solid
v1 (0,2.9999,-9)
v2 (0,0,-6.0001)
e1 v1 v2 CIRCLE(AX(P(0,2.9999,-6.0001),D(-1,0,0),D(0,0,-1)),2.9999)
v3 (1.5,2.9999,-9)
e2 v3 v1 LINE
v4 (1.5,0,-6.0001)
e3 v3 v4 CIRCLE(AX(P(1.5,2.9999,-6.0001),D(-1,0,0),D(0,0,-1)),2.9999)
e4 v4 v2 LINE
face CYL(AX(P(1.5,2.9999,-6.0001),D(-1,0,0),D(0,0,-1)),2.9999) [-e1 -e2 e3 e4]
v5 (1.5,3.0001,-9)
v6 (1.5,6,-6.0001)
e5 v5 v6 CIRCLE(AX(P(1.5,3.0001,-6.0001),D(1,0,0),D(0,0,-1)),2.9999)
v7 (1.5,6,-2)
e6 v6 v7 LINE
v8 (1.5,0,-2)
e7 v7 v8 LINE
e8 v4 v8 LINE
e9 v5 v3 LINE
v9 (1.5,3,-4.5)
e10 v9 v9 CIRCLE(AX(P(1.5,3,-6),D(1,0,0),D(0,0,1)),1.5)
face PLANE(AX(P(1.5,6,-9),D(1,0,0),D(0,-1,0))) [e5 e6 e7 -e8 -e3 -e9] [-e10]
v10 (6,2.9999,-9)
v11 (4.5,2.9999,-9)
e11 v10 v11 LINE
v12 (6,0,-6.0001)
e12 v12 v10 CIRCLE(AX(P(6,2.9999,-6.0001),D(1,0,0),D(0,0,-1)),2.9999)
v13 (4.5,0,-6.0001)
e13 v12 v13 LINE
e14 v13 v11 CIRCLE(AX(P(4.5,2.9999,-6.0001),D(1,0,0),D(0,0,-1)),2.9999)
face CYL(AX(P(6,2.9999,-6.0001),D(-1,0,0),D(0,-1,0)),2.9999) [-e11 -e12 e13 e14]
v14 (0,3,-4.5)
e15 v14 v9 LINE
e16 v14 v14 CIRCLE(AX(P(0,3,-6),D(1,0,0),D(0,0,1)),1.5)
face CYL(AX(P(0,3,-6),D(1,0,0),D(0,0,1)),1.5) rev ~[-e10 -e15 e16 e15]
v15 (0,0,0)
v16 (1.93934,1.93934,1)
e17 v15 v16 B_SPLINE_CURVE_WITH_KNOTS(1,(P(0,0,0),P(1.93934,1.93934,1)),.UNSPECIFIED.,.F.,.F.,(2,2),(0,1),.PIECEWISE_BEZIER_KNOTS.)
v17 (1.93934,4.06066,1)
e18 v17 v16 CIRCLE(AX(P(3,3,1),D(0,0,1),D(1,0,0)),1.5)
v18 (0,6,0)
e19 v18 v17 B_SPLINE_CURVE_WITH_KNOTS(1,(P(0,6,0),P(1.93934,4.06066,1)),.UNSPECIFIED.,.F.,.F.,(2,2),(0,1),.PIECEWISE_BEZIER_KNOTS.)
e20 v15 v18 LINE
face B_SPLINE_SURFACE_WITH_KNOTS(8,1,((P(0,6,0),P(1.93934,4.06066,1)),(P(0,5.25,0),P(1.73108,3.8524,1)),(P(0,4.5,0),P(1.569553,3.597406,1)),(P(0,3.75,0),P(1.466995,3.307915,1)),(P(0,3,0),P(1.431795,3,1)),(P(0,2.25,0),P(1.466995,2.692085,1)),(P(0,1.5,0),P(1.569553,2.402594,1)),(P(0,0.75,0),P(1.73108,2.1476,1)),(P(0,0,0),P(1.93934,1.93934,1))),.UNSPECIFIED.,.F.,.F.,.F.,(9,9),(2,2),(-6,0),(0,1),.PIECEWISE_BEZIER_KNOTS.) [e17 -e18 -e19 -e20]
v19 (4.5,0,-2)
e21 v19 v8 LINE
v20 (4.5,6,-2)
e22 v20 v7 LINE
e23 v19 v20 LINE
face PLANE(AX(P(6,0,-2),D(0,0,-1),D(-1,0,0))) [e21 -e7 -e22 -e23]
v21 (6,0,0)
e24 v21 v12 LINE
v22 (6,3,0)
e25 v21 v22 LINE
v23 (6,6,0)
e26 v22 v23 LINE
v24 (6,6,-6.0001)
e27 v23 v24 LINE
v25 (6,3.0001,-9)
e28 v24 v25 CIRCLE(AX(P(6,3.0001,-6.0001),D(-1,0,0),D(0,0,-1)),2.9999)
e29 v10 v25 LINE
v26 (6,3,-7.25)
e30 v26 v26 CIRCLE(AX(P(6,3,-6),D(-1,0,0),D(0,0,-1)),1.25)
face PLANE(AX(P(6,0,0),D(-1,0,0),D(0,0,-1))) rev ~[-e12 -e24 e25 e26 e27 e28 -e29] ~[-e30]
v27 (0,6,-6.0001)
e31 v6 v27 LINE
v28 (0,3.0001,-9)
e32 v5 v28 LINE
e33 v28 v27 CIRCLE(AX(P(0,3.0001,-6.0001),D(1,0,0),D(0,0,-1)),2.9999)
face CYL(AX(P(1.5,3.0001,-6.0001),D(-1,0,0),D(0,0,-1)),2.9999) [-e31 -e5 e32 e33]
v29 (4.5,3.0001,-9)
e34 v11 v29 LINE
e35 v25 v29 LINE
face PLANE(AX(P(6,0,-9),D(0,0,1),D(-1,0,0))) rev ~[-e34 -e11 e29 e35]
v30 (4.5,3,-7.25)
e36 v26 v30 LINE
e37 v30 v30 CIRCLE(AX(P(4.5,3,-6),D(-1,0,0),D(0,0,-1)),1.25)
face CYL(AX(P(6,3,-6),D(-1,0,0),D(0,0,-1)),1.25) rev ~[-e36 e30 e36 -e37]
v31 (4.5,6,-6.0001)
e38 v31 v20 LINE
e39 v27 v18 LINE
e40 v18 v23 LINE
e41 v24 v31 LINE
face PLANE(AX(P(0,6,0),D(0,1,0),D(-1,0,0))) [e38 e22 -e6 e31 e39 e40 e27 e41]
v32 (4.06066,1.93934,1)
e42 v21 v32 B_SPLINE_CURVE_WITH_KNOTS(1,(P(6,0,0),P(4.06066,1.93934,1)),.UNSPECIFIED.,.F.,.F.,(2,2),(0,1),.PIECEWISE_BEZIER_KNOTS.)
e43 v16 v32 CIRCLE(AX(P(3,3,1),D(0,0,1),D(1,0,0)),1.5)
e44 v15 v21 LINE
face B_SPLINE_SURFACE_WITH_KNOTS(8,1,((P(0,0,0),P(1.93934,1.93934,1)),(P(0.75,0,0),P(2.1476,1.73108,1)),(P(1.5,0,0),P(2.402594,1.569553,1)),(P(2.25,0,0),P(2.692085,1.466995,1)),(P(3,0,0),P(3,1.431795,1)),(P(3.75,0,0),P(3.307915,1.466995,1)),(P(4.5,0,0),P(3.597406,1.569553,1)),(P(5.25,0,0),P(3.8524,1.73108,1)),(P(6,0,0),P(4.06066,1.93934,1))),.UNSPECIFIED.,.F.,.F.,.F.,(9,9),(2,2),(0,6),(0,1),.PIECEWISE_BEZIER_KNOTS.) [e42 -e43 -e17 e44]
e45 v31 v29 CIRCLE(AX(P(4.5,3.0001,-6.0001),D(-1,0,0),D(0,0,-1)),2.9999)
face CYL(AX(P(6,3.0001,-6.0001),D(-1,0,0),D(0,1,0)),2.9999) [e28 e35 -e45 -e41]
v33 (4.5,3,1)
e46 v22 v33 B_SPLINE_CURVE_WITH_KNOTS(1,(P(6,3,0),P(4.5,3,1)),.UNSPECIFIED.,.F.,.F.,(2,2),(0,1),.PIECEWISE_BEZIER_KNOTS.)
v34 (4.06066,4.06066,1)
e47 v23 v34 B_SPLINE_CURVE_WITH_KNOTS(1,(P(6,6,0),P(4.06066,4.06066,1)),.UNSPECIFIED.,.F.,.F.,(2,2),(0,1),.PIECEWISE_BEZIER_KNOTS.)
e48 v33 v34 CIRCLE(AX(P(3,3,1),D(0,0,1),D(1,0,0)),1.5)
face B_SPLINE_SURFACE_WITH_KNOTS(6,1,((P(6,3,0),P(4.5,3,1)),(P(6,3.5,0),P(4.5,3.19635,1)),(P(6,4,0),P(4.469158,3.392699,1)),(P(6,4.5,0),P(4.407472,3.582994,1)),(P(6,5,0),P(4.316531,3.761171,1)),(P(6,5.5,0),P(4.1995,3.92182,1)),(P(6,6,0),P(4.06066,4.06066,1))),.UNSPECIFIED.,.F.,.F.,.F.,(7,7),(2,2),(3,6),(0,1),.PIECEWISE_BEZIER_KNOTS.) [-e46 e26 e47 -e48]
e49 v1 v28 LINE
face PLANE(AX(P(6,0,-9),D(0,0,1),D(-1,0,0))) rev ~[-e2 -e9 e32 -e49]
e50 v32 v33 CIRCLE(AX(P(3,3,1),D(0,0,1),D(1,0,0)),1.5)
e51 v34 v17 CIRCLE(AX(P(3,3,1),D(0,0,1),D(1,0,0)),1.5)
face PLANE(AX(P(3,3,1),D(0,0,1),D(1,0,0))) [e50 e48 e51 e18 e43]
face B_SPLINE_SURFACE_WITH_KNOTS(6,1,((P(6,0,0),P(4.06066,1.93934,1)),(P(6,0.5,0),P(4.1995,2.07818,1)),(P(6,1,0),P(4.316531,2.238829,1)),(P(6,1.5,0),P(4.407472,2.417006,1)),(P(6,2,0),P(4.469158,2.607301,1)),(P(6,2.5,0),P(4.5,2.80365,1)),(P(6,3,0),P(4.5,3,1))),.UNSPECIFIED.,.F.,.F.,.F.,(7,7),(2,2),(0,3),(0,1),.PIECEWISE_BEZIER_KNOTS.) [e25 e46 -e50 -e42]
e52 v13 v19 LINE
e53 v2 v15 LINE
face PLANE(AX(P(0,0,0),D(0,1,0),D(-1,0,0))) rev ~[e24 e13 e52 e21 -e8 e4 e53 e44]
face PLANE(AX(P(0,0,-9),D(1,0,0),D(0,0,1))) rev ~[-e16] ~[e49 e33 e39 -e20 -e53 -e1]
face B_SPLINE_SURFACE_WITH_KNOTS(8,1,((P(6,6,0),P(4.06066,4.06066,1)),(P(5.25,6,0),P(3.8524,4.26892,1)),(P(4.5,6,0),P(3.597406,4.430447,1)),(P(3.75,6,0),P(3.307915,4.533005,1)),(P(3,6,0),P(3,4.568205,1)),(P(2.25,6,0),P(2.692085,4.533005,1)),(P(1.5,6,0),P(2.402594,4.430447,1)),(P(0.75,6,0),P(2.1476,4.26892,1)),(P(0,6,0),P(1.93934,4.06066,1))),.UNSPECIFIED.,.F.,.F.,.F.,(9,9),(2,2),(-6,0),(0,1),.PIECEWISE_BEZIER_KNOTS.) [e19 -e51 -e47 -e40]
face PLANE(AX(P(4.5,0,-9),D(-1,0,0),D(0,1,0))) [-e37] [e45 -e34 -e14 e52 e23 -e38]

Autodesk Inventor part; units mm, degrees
ref_plane "YZ Plane" through (0, 0, 0) normal (1, 0, 0) x (0, 1, 0)
ref_plane "XZ Plane" through (0, 0, 0) normal (0, 1, 0) x (-1, 0, 0)
sketch "Sketch1" plane through (0, 0, 0) normal (0, 1, 0) x (-1, 0, 0)
  line L0 (0, 0) -> (-6, 0)
  line L1 (-6, 0) -> (-6, -9)
  line L2 (-6, -9) -> (0, -9)
  line L3 (0, -9) -> (0, 0)
  dimension "d0" = 6
  dimension "d1" = 9
extrude "Extrusion1" add sketch "Sketch1" along normal blind 6
sketch "Sketch2" plane through (6, 0, -9) normal (0, 0, -1) x (-1, 0, 0)
  line L0 (0, 6) -> (6, 6) projected
  line L1 (0, 0) -> (6, 0) projected
  line L2 (1.5, 6) -> (4.5, 6)
  line L3 (4.5, 6) -> (4.5, 0)
  line L4 (4.5, 0) -> (1.5, 0)
  line L5 (1.5, 0) -> (1.5, 6)
  line L6 (0, 0) -> (0, 6) projected
  dimension "d4" = 3
  dimension "d5" = 1.5
sketch "Sketch3" plane through (0, 0, 0) normal (0, -1, 0) x (1, 0, 0)
  line L0 (6, 0) -> (6, -9) projected
  line L1 (0, 0) -> (6, 0) projected
  point P0 (3, 1)
  dimension "d6" = 3
  dimension "d7" = 1
ref_plane "Work Plane1" through (3, 0, 1) normal (0, 0, 1) x (1, 0, 0)
sketch "Sketch4" plane through (3, 0, 1) normal (0, 0, 1) x (1, 0, 0)
  point P0 (-3, 0)
sketch "Sketch5" plane through (3, 0, 1) normal (0, 0, 1) x (1, 0, 0)
  circle A0 centre (0, 3) radius 1.5
  point P0 (-3, 0)
  dimension "d8" = 3
loft "Loft1" add profiles "Sketch5" section 1 edges at (3, 0, 0) (6, 3, 0) (3, 6, 0) (0, 3, 0)
extrude "Extrusion2" cut sketch "Sketch2" against normal blind 7 contours L0 L3 L1 L5
sketch "Sketch6" plane through (6, 0, -9) normal (1, 0, 0) x (0, 0, -1)
  line L0 (-9, 0) -> (-9, 6) projected
  line L1 (-9, 6) -> (0, 6) projected
  point P0 (-3, 3)
  dimension "d15" = 6
  dimension "d16" = 3
hole "Hole1" at (6, 3, -6) direction (-1, 0, 0) diameter 2.5 depth 1.5 tip angle 118
sketch "Sketch7" plane through (0, 0, -9) normal (-1, 0, 0) x (0, 0, 1)
  circle A0 centre (3, 3) radius 1.25 projected
  point P0 (9, 0)
hole "Hole2" at (0, 3, -6) at (0, 3, -6) direction (1, 0, 0) diameter 3 depth 1.5 tip angle 118
thread "Thread1" size "M2.5x0.45" class "6H" standard "ANSI Metric M Profile" full length
fillet "Fillet1" radius 3 4 edges at (5.25, 6, -9) (5.25, 0, -9) (0.75, 0, -9) (0.75, 6, -9)
sketch "Sketch8" plane through (6, 0, -2) normal (0, 0, -1) x (-1, 0, 0)
  line L0 (4.5, 6) -> (4.5, 0) projected
  line L1 (1.5, 6) -> (4.5, 6) projected
  line L2 (1.5, 0) -> (1.5, 6) projected
  line L3 (4.5, 0) -> (1.5, 0) projected
  point P0 (6, 0)
  point P1 (3, 3)
properties material "Brass, Soft Yellow, Welded"
